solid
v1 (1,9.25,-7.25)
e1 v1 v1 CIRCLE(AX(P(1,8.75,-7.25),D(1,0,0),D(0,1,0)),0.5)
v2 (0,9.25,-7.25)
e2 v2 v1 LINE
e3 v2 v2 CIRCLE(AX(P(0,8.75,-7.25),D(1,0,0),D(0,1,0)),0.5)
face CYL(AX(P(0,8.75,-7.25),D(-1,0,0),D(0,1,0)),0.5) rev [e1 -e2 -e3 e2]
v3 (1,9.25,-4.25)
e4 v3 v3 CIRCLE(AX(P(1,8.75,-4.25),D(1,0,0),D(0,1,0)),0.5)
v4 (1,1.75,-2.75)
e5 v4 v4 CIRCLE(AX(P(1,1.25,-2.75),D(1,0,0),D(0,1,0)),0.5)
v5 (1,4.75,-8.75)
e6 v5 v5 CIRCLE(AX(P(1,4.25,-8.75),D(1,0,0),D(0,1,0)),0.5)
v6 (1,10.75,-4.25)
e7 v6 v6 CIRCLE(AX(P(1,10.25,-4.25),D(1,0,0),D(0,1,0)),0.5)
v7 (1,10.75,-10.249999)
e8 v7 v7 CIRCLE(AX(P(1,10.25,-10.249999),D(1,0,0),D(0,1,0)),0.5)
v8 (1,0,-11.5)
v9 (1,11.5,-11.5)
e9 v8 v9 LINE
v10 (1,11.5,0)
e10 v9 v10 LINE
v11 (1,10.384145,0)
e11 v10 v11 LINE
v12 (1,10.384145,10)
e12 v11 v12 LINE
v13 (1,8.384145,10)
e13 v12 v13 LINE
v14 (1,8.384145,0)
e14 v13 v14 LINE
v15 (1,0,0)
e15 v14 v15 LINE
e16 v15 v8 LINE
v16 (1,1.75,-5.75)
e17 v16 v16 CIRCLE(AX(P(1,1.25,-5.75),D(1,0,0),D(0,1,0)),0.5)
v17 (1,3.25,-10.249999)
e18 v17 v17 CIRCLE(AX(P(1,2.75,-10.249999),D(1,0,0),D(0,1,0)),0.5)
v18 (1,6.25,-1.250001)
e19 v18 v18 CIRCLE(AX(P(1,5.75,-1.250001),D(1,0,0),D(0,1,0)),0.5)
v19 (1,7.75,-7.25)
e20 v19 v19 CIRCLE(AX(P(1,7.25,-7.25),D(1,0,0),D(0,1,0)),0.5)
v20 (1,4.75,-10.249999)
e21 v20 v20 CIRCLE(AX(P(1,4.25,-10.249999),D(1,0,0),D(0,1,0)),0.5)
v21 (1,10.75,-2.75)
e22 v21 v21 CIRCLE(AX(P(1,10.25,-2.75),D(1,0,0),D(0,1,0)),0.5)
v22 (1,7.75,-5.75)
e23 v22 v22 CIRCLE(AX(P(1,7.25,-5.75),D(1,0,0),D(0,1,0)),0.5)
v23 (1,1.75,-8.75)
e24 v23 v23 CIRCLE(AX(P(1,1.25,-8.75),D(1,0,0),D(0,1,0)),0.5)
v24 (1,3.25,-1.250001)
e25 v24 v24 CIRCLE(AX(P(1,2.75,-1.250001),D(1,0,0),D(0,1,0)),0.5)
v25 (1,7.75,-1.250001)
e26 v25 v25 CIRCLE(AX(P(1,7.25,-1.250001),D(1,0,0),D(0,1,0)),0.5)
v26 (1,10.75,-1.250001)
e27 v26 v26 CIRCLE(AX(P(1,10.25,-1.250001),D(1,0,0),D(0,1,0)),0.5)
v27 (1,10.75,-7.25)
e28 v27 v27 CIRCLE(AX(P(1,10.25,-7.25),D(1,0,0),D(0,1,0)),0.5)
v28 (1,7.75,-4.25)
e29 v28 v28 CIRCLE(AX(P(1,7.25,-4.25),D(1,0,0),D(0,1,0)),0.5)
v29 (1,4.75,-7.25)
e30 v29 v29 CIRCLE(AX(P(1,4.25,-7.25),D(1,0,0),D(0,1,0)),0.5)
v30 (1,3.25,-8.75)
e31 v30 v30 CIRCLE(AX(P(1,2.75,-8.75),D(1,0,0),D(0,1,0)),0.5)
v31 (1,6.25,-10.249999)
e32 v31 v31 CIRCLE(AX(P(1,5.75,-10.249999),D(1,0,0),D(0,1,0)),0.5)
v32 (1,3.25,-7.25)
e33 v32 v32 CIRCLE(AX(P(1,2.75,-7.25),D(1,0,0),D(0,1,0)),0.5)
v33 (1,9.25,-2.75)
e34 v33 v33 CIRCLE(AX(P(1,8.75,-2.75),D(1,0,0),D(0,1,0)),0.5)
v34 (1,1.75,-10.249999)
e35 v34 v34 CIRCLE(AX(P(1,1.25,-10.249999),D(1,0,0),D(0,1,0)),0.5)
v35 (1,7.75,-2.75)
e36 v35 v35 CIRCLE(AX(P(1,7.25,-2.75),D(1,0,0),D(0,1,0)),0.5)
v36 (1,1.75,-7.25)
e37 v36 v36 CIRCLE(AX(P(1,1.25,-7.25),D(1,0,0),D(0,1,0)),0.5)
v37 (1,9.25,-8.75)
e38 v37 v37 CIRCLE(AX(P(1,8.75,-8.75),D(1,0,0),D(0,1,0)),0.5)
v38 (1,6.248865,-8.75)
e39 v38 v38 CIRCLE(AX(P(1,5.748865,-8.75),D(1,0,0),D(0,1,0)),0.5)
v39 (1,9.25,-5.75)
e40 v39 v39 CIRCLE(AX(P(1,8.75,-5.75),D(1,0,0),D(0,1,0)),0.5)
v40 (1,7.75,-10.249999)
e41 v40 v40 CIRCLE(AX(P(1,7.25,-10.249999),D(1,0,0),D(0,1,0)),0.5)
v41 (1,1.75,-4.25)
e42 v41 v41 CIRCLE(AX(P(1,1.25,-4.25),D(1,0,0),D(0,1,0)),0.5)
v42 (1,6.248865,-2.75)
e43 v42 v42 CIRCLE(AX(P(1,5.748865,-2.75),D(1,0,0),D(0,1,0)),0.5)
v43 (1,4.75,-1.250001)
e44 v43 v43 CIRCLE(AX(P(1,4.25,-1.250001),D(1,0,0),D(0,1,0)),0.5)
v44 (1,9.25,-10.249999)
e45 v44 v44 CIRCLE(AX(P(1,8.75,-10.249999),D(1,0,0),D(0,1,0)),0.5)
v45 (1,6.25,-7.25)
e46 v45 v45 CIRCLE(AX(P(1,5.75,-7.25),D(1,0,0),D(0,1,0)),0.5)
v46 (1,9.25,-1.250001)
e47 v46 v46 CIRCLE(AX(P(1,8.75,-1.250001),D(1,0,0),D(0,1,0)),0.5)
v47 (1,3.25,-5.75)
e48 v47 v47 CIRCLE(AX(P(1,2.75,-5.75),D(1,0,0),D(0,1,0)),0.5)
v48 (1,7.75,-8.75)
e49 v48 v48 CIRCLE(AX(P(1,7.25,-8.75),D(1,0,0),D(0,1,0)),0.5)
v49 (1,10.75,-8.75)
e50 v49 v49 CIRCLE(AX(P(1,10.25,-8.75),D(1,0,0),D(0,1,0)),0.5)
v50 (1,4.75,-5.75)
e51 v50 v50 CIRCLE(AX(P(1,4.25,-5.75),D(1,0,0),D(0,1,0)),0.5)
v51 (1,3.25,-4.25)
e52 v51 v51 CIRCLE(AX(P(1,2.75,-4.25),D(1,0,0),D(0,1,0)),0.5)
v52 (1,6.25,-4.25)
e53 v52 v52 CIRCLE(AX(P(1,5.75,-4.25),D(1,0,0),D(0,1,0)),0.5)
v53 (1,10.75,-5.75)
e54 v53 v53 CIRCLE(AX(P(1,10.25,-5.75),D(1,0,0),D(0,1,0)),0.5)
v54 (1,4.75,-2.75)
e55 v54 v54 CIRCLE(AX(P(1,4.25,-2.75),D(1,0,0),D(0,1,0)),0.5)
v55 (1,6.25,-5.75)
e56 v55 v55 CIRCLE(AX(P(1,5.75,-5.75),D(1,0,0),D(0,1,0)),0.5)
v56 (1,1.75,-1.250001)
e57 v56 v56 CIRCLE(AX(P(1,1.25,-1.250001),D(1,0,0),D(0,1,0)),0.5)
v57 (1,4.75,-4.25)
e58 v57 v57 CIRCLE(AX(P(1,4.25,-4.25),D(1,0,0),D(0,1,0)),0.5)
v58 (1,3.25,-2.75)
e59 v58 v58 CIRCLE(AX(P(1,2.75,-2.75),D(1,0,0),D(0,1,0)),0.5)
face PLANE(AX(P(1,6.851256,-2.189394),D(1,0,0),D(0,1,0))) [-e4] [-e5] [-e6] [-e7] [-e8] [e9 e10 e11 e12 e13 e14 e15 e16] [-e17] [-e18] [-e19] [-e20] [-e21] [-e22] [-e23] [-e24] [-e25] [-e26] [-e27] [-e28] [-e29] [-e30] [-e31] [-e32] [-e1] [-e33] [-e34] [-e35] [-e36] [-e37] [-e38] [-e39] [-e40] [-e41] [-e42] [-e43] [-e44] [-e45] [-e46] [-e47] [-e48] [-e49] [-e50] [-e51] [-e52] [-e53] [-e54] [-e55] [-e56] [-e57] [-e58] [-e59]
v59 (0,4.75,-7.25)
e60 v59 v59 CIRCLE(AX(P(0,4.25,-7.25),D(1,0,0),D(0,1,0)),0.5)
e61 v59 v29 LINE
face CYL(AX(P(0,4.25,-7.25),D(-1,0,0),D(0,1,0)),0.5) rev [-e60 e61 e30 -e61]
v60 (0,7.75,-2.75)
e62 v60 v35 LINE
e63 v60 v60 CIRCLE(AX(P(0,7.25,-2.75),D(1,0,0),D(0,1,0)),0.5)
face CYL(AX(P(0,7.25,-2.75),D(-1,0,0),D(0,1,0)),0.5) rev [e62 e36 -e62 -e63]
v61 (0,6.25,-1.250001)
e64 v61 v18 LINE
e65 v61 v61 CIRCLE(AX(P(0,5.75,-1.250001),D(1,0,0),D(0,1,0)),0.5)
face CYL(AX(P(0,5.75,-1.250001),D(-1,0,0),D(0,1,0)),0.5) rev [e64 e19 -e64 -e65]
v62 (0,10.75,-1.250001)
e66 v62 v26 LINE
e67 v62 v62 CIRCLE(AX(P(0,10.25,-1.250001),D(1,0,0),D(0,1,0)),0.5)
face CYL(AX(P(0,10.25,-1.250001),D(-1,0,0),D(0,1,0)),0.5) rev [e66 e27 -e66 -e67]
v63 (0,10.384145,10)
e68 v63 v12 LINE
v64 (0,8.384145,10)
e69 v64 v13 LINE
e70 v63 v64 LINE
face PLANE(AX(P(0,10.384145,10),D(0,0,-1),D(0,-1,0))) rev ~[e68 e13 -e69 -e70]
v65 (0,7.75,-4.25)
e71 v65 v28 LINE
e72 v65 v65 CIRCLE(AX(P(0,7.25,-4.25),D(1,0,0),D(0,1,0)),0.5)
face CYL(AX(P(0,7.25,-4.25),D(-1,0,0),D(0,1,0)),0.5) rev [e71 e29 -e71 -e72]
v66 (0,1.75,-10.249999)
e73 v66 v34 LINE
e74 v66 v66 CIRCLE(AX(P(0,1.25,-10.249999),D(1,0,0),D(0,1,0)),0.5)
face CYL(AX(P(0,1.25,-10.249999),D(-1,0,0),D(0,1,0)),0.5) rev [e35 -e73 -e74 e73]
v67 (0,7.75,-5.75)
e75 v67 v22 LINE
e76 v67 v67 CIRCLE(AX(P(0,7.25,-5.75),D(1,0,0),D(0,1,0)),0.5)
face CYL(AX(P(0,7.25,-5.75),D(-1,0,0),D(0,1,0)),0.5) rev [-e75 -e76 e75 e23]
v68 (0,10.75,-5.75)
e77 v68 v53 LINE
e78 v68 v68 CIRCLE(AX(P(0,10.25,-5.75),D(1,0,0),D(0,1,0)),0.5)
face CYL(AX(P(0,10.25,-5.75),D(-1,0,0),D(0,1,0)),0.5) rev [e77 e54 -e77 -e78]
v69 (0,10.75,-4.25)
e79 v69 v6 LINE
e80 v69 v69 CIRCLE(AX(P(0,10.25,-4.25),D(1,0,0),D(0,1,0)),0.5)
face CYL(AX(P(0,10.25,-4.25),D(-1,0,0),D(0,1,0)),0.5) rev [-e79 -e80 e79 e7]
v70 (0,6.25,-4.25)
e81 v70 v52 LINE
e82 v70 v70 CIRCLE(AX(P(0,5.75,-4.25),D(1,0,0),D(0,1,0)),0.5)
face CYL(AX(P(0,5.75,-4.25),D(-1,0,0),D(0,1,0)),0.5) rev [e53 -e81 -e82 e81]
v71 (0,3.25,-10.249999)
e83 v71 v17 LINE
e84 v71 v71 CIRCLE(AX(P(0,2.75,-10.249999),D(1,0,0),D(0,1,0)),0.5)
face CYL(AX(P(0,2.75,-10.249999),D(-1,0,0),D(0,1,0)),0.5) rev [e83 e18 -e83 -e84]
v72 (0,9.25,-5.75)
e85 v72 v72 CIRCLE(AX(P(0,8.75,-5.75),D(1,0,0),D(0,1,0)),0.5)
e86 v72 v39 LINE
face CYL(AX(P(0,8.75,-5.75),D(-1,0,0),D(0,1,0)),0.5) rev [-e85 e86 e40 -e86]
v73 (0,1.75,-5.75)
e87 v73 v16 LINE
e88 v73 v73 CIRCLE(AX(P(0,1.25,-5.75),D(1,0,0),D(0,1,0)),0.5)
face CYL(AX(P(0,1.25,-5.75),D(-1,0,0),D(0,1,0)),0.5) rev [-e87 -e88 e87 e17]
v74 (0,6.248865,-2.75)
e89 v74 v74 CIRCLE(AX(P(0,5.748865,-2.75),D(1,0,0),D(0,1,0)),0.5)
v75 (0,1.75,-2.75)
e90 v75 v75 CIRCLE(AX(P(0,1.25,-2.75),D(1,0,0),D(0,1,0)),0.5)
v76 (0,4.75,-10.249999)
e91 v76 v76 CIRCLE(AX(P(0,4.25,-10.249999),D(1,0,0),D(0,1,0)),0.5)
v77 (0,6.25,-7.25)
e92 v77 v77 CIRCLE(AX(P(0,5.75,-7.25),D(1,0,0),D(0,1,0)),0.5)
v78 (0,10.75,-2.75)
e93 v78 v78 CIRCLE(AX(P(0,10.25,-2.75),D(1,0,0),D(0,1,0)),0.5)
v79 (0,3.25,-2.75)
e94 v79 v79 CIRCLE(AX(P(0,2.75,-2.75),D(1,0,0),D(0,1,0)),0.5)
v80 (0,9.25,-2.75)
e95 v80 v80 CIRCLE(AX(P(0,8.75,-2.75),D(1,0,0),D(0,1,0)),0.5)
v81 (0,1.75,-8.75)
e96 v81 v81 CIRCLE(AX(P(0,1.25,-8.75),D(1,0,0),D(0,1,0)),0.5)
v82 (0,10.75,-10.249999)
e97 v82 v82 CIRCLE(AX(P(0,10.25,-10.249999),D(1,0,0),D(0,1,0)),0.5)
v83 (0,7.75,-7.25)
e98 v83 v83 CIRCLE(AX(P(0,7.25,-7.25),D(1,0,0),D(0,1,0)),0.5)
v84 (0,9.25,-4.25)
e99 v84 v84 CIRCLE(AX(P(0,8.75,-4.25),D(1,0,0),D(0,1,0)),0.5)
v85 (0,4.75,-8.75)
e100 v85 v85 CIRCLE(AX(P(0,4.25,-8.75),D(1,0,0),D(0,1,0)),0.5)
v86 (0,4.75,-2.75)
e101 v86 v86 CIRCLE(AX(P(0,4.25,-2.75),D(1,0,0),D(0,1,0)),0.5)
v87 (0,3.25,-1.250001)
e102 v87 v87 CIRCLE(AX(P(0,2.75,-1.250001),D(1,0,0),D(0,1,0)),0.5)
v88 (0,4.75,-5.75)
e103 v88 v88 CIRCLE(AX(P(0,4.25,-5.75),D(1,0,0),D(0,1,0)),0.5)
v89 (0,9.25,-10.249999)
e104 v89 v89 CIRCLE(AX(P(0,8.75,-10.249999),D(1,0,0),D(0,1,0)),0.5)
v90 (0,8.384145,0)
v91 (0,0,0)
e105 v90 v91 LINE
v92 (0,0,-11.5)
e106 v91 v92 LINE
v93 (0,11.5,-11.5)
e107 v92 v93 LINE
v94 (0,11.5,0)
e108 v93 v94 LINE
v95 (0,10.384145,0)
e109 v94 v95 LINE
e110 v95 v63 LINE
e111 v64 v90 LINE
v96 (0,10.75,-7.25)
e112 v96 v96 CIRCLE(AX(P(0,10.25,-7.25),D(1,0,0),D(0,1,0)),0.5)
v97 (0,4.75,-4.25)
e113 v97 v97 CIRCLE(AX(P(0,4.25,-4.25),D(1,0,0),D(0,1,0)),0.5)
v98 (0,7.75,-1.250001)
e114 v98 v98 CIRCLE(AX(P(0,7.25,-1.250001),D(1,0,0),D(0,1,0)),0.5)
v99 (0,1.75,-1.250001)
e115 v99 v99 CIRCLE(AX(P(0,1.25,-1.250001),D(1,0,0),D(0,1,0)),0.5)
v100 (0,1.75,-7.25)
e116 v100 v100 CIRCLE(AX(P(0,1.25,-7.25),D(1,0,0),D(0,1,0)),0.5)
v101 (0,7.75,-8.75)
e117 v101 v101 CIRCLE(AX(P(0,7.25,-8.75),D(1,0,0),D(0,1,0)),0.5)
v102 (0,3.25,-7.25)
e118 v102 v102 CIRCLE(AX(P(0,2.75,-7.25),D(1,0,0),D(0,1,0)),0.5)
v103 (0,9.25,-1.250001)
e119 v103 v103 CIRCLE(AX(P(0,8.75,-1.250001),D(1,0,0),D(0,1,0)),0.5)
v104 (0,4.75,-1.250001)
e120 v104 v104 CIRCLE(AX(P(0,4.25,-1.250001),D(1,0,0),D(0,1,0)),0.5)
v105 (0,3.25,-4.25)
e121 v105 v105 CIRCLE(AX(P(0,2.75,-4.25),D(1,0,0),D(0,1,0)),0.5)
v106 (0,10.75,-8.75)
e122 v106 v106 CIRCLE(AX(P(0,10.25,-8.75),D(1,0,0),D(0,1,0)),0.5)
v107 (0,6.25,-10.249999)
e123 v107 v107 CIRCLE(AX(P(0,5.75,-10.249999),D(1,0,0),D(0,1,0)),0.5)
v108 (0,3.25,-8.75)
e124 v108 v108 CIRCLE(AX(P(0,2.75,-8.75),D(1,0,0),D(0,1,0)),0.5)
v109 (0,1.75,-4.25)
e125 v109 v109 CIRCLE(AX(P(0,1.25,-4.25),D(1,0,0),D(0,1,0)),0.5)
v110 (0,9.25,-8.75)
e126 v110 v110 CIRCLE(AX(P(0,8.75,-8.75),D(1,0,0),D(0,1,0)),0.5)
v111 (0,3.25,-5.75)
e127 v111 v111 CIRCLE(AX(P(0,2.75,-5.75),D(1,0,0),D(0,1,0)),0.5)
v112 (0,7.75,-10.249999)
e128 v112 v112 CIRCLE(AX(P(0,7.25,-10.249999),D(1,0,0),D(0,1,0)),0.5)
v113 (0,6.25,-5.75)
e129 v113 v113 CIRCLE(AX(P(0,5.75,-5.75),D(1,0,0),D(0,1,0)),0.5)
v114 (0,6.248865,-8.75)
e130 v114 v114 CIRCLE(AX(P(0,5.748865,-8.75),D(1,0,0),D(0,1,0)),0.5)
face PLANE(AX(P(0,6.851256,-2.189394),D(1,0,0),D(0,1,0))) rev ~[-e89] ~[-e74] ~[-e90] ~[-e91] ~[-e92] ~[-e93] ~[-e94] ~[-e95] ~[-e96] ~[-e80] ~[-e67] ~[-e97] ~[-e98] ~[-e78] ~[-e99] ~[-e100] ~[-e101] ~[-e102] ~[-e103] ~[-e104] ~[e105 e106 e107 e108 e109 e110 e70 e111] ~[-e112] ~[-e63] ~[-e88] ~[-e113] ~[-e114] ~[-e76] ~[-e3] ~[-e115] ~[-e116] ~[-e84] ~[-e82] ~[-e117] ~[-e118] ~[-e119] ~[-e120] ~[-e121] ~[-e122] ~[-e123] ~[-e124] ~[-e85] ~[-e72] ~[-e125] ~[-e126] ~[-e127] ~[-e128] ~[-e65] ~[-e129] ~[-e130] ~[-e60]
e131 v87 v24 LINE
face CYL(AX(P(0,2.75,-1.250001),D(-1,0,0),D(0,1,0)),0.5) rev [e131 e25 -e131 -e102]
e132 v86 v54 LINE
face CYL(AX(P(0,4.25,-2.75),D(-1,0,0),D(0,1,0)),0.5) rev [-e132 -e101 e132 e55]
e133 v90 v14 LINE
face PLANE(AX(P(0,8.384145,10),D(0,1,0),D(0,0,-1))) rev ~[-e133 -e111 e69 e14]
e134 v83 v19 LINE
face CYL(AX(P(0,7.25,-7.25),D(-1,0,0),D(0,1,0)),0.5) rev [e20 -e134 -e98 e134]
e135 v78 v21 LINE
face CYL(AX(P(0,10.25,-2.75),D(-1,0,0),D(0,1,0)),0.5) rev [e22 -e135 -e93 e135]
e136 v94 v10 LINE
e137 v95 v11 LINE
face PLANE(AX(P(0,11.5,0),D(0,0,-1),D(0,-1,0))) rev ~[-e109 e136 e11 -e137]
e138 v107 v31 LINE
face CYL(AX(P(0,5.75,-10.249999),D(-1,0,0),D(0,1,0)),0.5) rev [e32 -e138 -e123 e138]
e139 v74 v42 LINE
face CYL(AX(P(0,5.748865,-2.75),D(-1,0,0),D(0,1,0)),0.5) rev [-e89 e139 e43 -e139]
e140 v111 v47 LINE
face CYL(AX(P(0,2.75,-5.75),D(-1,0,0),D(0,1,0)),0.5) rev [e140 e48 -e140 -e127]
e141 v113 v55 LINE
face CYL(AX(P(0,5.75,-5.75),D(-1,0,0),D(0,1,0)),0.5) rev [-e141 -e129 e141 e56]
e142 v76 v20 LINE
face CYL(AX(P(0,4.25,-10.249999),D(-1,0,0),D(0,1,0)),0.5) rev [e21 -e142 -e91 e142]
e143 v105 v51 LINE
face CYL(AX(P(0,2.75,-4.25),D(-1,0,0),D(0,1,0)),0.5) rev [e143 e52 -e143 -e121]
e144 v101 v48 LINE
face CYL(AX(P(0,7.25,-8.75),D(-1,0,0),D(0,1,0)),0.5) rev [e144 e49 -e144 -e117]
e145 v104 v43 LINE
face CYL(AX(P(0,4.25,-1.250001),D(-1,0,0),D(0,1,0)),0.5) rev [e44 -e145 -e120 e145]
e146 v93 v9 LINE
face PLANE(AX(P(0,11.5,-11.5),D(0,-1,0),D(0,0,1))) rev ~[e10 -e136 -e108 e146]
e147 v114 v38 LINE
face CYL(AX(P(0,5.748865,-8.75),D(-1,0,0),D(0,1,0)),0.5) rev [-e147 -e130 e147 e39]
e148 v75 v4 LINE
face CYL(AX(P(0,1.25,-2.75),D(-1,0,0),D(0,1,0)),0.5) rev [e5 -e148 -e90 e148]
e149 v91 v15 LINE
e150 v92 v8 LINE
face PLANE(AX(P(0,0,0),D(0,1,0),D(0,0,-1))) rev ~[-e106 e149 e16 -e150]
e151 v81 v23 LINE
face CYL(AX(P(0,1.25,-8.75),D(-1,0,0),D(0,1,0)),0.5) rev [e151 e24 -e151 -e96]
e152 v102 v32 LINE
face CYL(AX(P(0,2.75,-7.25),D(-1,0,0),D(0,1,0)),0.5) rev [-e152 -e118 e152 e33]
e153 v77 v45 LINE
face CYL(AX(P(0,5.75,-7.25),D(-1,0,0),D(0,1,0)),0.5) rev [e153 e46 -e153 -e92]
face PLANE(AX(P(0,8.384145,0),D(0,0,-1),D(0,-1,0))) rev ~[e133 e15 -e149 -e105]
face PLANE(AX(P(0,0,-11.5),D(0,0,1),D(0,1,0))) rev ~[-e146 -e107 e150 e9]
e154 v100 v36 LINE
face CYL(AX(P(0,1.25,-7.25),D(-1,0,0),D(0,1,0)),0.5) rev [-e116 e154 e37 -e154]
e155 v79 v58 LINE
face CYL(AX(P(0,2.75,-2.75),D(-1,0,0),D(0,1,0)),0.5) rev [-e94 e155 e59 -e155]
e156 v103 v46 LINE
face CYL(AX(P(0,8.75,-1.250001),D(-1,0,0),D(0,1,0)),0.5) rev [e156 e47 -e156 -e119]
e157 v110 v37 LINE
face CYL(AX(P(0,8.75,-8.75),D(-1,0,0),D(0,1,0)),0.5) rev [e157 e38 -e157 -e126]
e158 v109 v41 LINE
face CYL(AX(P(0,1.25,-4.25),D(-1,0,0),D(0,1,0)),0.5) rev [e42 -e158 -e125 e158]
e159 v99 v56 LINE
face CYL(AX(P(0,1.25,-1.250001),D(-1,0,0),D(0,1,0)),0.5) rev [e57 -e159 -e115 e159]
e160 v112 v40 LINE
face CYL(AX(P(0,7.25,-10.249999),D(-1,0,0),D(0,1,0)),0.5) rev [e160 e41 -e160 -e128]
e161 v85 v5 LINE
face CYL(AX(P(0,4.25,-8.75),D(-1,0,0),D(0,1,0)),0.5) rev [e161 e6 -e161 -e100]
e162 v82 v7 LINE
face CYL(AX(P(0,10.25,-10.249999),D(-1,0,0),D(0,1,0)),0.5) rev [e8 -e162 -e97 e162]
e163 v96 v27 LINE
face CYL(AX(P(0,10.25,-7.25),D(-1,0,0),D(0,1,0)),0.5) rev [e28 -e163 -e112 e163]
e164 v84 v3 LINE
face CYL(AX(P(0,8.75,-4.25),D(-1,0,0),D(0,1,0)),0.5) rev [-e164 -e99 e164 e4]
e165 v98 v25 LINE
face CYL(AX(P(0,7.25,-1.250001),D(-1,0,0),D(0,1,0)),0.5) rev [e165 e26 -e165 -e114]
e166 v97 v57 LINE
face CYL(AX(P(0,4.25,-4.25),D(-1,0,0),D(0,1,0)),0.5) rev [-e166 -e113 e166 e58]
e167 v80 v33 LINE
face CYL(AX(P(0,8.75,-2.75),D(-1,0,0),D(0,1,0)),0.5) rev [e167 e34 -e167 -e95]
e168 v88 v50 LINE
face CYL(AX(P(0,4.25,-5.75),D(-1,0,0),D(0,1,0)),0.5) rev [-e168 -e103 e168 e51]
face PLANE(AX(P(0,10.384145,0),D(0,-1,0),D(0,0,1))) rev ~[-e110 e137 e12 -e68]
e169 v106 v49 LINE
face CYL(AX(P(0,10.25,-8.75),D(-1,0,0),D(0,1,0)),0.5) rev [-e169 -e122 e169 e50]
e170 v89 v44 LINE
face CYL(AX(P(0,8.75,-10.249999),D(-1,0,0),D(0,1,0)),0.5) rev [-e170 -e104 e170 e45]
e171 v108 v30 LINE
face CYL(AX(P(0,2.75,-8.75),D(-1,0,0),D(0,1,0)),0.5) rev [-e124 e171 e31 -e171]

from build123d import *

# Parameters (mm, degrees)
F0_R     = 0.5
F1_DEPTH = 1


# Not quite as in the source:
# - a feature names something its author has since deleted; it is built from what else it names


with BuildPart() as f1:
    # F0 (on Right) → F1 (new body)
    with BuildSketch(Plane.YZ):
        Polygon((8.384144865, 0), (0, 0), (0, -11.5), (11.5, -11.5), (11.5, 0), (10.384144865, 0), (10.384144865, 10), (8.384144865, 10), align=None)
        with Locations((1.25, -10.249999141)):
            Circle(F0_R, mode=Mode.SUBTRACT)
        with Locations((2.75, -10.249999141)):
            Circle(F0_R, mode=Mode.SUBTRACT)
        with Locations((1.25, -8.7499995705)):
            Circle(F0_R, mode=Mode.SUBTRACT)
        with Locations((1.25, -7.25)):
            Circle(F0_R, mode=Mode.SUBTRACT)
        with Locations((2.75, -8.7499995705)):
            Circle(F0_R, mode=Mode.SUBTRACT)
        with Locations((2.75, -7.25)):
            Circle(F0_R, mode=Mode.SUBTRACT)
        with Locations((4.25, -10.249999141)):
            Circle(F0_R, mode=Mode.SUBTRACT)
        with Locations((4.25, -8.7499995705)):
            Circle(F0_R, mode=Mode.SUBTRACT)
        with Locations((4.25, -7.25)):
            Circle(F0_R, mode=Mode.SUBTRACT)
        with Locations((5.7488648942, -8.7499995705)):
            Circle(F0_R, mode=Mode.SUBTRACT)
        with Locations((1.25, -5.75)):
            Circle(F0_R, mode=Mode.SUBTRACT)
        with Locations((1.25, -4.25)):
            Circle(F0_R, mode=Mode.SUBTRACT)
        with Locations((2.75, -5.75)):
            Circle(F0_R, mode=Mode.SUBTRACT)
        with Locations((2.75, -4.25)):
            Circle(F0_R, mode=Mode.SUBTRACT)
        with Locations((1.25, -2.7500004295)):
            Circle(F0_R, mode=Mode.SUBTRACT)
        with Locations((1.25, -1.250000859)):
            Circle(F0_R, mode=Mode.SUBTRACT)
        with Locations((2.75, -2.7500004295)):
            Circle(F0_R, mode=Mode.SUBTRACT)
        with Locations((2.75, -1.250000859)):
            Circle(F0_R, mode=Mode.SUBTRACT)
        with Locations((4.25, -5.75)):
            Circle(F0_R, mode=Mode.SUBTRACT)
        with Locations((4.25, -4.25)):
            Circle(F0_R, mode=Mode.SUBTRACT)
        with Locations((4.25, -2.7500004295)):
            Circle(F0_R, mode=Mode.SUBTRACT)
        with Locations((4.25, -1.250000859)):
            Circle(F0_R, mode=Mode.SUBTRACT)
        with Locations((5.7488648942, -2.7500004295)):
            Circle(F0_R, mode=Mode.SUBTRACT)
        with Locations((5.75, -10.249999141)):
            Circle(F0_R, mode=Mode.SUBTRACT)
        with Locations((7.25, -10.249999141)):
            Circle(F0_R, mode=Mode.SUBTRACT)
        with Locations((5.75, -7.25)):
            Circle(F0_R, mode=Mode.SUBTRACT)
        with Locations((7.25, -8.7499995705)):
            Circle(F0_R, mode=Mode.SUBTRACT)
        with Locations((7.25, -7.25)):
            Circle(F0_R, mode=Mode.SUBTRACT)
        with Locations((8.75, -10.249999141)):
            Circle(F0_R, mode=Mode.SUBTRACT)
        with Locations((10.25, -10.249999141)):
            Circle(F0_R, mode=Mode.SUBTRACT)
        with Locations((8.75, -8.7499995705)):
            Circle(F0_R, mode=Mode.SUBTRACT)
        with Locations((8.75, -7.25)):
            Circle(F0_R, mode=Mode.SUBTRACT)
        with Locations((10.25, -8.7499995705)):
            Circle(F0_R, mode=Mode.SUBTRACT)
        with Locations((10.25, -7.25)):
            Circle(F0_R, mode=Mode.SUBTRACT)
        with Locations((5.75, -5.75)):
            Circle(F0_R, mode=Mode.SUBTRACT)
        with Locations((5.75, -4.25)):
            Circle(F0_R, mode=Mode.SUBTRACT)
        with Locations((7.25, -5.75)):
            Circle(F0_R, mode=Mode.SUBTRACT)
        with Locations((7.25, -4.25)):
            Circle(F0_R, mode=Mode.SUBTRACT)
        with Locations((5.75, -1.250000859)):
            Circle(F0_R, mode=Mode.SUBTRACT)
        with Locations((7.25, -2.7500004295)):
            Circle(F0_R, mode=Mode.SUBTRACT)
        with Locations((7.25, -1.250000859)):
            Circle(F0_R, mode=Mode.SUBTRACT)
        with Locations((8.75, -5.75)):
            Circle(F0_R, mode=Mode.SUBTRACT)
        with Locations((8.75, -4.25)):
            Circle(F0_R, mode=Mode.SUBTRACT)
        with Locations((10.25, -5.75)):
            Circle(F0_R, mode=Mode.SUBTRACT)
        with Locations((10.25, -4.25)):
            Circle(F0_R, mode=Mode.SUBTRACT)
        with Locations((8.75, -2.7500004295)):
            Circle(F0_R, mode=Mode.SUBTRACT)
        with Locations((8.75, -1.250000859)):
            Circle(F0_R, mode=Mode.SUBTRACT)
        with Locations((10.25, -2.7500004295)):
            Circle(F0_R, mode=Mode.SUBTRACT)
        with Locations((10.25, -1.250000859)):
            Circle(F0_R, mode=Mode.SUBTRACT)
    extrude(amount=F1_DEPTH)


solid = f1.part
